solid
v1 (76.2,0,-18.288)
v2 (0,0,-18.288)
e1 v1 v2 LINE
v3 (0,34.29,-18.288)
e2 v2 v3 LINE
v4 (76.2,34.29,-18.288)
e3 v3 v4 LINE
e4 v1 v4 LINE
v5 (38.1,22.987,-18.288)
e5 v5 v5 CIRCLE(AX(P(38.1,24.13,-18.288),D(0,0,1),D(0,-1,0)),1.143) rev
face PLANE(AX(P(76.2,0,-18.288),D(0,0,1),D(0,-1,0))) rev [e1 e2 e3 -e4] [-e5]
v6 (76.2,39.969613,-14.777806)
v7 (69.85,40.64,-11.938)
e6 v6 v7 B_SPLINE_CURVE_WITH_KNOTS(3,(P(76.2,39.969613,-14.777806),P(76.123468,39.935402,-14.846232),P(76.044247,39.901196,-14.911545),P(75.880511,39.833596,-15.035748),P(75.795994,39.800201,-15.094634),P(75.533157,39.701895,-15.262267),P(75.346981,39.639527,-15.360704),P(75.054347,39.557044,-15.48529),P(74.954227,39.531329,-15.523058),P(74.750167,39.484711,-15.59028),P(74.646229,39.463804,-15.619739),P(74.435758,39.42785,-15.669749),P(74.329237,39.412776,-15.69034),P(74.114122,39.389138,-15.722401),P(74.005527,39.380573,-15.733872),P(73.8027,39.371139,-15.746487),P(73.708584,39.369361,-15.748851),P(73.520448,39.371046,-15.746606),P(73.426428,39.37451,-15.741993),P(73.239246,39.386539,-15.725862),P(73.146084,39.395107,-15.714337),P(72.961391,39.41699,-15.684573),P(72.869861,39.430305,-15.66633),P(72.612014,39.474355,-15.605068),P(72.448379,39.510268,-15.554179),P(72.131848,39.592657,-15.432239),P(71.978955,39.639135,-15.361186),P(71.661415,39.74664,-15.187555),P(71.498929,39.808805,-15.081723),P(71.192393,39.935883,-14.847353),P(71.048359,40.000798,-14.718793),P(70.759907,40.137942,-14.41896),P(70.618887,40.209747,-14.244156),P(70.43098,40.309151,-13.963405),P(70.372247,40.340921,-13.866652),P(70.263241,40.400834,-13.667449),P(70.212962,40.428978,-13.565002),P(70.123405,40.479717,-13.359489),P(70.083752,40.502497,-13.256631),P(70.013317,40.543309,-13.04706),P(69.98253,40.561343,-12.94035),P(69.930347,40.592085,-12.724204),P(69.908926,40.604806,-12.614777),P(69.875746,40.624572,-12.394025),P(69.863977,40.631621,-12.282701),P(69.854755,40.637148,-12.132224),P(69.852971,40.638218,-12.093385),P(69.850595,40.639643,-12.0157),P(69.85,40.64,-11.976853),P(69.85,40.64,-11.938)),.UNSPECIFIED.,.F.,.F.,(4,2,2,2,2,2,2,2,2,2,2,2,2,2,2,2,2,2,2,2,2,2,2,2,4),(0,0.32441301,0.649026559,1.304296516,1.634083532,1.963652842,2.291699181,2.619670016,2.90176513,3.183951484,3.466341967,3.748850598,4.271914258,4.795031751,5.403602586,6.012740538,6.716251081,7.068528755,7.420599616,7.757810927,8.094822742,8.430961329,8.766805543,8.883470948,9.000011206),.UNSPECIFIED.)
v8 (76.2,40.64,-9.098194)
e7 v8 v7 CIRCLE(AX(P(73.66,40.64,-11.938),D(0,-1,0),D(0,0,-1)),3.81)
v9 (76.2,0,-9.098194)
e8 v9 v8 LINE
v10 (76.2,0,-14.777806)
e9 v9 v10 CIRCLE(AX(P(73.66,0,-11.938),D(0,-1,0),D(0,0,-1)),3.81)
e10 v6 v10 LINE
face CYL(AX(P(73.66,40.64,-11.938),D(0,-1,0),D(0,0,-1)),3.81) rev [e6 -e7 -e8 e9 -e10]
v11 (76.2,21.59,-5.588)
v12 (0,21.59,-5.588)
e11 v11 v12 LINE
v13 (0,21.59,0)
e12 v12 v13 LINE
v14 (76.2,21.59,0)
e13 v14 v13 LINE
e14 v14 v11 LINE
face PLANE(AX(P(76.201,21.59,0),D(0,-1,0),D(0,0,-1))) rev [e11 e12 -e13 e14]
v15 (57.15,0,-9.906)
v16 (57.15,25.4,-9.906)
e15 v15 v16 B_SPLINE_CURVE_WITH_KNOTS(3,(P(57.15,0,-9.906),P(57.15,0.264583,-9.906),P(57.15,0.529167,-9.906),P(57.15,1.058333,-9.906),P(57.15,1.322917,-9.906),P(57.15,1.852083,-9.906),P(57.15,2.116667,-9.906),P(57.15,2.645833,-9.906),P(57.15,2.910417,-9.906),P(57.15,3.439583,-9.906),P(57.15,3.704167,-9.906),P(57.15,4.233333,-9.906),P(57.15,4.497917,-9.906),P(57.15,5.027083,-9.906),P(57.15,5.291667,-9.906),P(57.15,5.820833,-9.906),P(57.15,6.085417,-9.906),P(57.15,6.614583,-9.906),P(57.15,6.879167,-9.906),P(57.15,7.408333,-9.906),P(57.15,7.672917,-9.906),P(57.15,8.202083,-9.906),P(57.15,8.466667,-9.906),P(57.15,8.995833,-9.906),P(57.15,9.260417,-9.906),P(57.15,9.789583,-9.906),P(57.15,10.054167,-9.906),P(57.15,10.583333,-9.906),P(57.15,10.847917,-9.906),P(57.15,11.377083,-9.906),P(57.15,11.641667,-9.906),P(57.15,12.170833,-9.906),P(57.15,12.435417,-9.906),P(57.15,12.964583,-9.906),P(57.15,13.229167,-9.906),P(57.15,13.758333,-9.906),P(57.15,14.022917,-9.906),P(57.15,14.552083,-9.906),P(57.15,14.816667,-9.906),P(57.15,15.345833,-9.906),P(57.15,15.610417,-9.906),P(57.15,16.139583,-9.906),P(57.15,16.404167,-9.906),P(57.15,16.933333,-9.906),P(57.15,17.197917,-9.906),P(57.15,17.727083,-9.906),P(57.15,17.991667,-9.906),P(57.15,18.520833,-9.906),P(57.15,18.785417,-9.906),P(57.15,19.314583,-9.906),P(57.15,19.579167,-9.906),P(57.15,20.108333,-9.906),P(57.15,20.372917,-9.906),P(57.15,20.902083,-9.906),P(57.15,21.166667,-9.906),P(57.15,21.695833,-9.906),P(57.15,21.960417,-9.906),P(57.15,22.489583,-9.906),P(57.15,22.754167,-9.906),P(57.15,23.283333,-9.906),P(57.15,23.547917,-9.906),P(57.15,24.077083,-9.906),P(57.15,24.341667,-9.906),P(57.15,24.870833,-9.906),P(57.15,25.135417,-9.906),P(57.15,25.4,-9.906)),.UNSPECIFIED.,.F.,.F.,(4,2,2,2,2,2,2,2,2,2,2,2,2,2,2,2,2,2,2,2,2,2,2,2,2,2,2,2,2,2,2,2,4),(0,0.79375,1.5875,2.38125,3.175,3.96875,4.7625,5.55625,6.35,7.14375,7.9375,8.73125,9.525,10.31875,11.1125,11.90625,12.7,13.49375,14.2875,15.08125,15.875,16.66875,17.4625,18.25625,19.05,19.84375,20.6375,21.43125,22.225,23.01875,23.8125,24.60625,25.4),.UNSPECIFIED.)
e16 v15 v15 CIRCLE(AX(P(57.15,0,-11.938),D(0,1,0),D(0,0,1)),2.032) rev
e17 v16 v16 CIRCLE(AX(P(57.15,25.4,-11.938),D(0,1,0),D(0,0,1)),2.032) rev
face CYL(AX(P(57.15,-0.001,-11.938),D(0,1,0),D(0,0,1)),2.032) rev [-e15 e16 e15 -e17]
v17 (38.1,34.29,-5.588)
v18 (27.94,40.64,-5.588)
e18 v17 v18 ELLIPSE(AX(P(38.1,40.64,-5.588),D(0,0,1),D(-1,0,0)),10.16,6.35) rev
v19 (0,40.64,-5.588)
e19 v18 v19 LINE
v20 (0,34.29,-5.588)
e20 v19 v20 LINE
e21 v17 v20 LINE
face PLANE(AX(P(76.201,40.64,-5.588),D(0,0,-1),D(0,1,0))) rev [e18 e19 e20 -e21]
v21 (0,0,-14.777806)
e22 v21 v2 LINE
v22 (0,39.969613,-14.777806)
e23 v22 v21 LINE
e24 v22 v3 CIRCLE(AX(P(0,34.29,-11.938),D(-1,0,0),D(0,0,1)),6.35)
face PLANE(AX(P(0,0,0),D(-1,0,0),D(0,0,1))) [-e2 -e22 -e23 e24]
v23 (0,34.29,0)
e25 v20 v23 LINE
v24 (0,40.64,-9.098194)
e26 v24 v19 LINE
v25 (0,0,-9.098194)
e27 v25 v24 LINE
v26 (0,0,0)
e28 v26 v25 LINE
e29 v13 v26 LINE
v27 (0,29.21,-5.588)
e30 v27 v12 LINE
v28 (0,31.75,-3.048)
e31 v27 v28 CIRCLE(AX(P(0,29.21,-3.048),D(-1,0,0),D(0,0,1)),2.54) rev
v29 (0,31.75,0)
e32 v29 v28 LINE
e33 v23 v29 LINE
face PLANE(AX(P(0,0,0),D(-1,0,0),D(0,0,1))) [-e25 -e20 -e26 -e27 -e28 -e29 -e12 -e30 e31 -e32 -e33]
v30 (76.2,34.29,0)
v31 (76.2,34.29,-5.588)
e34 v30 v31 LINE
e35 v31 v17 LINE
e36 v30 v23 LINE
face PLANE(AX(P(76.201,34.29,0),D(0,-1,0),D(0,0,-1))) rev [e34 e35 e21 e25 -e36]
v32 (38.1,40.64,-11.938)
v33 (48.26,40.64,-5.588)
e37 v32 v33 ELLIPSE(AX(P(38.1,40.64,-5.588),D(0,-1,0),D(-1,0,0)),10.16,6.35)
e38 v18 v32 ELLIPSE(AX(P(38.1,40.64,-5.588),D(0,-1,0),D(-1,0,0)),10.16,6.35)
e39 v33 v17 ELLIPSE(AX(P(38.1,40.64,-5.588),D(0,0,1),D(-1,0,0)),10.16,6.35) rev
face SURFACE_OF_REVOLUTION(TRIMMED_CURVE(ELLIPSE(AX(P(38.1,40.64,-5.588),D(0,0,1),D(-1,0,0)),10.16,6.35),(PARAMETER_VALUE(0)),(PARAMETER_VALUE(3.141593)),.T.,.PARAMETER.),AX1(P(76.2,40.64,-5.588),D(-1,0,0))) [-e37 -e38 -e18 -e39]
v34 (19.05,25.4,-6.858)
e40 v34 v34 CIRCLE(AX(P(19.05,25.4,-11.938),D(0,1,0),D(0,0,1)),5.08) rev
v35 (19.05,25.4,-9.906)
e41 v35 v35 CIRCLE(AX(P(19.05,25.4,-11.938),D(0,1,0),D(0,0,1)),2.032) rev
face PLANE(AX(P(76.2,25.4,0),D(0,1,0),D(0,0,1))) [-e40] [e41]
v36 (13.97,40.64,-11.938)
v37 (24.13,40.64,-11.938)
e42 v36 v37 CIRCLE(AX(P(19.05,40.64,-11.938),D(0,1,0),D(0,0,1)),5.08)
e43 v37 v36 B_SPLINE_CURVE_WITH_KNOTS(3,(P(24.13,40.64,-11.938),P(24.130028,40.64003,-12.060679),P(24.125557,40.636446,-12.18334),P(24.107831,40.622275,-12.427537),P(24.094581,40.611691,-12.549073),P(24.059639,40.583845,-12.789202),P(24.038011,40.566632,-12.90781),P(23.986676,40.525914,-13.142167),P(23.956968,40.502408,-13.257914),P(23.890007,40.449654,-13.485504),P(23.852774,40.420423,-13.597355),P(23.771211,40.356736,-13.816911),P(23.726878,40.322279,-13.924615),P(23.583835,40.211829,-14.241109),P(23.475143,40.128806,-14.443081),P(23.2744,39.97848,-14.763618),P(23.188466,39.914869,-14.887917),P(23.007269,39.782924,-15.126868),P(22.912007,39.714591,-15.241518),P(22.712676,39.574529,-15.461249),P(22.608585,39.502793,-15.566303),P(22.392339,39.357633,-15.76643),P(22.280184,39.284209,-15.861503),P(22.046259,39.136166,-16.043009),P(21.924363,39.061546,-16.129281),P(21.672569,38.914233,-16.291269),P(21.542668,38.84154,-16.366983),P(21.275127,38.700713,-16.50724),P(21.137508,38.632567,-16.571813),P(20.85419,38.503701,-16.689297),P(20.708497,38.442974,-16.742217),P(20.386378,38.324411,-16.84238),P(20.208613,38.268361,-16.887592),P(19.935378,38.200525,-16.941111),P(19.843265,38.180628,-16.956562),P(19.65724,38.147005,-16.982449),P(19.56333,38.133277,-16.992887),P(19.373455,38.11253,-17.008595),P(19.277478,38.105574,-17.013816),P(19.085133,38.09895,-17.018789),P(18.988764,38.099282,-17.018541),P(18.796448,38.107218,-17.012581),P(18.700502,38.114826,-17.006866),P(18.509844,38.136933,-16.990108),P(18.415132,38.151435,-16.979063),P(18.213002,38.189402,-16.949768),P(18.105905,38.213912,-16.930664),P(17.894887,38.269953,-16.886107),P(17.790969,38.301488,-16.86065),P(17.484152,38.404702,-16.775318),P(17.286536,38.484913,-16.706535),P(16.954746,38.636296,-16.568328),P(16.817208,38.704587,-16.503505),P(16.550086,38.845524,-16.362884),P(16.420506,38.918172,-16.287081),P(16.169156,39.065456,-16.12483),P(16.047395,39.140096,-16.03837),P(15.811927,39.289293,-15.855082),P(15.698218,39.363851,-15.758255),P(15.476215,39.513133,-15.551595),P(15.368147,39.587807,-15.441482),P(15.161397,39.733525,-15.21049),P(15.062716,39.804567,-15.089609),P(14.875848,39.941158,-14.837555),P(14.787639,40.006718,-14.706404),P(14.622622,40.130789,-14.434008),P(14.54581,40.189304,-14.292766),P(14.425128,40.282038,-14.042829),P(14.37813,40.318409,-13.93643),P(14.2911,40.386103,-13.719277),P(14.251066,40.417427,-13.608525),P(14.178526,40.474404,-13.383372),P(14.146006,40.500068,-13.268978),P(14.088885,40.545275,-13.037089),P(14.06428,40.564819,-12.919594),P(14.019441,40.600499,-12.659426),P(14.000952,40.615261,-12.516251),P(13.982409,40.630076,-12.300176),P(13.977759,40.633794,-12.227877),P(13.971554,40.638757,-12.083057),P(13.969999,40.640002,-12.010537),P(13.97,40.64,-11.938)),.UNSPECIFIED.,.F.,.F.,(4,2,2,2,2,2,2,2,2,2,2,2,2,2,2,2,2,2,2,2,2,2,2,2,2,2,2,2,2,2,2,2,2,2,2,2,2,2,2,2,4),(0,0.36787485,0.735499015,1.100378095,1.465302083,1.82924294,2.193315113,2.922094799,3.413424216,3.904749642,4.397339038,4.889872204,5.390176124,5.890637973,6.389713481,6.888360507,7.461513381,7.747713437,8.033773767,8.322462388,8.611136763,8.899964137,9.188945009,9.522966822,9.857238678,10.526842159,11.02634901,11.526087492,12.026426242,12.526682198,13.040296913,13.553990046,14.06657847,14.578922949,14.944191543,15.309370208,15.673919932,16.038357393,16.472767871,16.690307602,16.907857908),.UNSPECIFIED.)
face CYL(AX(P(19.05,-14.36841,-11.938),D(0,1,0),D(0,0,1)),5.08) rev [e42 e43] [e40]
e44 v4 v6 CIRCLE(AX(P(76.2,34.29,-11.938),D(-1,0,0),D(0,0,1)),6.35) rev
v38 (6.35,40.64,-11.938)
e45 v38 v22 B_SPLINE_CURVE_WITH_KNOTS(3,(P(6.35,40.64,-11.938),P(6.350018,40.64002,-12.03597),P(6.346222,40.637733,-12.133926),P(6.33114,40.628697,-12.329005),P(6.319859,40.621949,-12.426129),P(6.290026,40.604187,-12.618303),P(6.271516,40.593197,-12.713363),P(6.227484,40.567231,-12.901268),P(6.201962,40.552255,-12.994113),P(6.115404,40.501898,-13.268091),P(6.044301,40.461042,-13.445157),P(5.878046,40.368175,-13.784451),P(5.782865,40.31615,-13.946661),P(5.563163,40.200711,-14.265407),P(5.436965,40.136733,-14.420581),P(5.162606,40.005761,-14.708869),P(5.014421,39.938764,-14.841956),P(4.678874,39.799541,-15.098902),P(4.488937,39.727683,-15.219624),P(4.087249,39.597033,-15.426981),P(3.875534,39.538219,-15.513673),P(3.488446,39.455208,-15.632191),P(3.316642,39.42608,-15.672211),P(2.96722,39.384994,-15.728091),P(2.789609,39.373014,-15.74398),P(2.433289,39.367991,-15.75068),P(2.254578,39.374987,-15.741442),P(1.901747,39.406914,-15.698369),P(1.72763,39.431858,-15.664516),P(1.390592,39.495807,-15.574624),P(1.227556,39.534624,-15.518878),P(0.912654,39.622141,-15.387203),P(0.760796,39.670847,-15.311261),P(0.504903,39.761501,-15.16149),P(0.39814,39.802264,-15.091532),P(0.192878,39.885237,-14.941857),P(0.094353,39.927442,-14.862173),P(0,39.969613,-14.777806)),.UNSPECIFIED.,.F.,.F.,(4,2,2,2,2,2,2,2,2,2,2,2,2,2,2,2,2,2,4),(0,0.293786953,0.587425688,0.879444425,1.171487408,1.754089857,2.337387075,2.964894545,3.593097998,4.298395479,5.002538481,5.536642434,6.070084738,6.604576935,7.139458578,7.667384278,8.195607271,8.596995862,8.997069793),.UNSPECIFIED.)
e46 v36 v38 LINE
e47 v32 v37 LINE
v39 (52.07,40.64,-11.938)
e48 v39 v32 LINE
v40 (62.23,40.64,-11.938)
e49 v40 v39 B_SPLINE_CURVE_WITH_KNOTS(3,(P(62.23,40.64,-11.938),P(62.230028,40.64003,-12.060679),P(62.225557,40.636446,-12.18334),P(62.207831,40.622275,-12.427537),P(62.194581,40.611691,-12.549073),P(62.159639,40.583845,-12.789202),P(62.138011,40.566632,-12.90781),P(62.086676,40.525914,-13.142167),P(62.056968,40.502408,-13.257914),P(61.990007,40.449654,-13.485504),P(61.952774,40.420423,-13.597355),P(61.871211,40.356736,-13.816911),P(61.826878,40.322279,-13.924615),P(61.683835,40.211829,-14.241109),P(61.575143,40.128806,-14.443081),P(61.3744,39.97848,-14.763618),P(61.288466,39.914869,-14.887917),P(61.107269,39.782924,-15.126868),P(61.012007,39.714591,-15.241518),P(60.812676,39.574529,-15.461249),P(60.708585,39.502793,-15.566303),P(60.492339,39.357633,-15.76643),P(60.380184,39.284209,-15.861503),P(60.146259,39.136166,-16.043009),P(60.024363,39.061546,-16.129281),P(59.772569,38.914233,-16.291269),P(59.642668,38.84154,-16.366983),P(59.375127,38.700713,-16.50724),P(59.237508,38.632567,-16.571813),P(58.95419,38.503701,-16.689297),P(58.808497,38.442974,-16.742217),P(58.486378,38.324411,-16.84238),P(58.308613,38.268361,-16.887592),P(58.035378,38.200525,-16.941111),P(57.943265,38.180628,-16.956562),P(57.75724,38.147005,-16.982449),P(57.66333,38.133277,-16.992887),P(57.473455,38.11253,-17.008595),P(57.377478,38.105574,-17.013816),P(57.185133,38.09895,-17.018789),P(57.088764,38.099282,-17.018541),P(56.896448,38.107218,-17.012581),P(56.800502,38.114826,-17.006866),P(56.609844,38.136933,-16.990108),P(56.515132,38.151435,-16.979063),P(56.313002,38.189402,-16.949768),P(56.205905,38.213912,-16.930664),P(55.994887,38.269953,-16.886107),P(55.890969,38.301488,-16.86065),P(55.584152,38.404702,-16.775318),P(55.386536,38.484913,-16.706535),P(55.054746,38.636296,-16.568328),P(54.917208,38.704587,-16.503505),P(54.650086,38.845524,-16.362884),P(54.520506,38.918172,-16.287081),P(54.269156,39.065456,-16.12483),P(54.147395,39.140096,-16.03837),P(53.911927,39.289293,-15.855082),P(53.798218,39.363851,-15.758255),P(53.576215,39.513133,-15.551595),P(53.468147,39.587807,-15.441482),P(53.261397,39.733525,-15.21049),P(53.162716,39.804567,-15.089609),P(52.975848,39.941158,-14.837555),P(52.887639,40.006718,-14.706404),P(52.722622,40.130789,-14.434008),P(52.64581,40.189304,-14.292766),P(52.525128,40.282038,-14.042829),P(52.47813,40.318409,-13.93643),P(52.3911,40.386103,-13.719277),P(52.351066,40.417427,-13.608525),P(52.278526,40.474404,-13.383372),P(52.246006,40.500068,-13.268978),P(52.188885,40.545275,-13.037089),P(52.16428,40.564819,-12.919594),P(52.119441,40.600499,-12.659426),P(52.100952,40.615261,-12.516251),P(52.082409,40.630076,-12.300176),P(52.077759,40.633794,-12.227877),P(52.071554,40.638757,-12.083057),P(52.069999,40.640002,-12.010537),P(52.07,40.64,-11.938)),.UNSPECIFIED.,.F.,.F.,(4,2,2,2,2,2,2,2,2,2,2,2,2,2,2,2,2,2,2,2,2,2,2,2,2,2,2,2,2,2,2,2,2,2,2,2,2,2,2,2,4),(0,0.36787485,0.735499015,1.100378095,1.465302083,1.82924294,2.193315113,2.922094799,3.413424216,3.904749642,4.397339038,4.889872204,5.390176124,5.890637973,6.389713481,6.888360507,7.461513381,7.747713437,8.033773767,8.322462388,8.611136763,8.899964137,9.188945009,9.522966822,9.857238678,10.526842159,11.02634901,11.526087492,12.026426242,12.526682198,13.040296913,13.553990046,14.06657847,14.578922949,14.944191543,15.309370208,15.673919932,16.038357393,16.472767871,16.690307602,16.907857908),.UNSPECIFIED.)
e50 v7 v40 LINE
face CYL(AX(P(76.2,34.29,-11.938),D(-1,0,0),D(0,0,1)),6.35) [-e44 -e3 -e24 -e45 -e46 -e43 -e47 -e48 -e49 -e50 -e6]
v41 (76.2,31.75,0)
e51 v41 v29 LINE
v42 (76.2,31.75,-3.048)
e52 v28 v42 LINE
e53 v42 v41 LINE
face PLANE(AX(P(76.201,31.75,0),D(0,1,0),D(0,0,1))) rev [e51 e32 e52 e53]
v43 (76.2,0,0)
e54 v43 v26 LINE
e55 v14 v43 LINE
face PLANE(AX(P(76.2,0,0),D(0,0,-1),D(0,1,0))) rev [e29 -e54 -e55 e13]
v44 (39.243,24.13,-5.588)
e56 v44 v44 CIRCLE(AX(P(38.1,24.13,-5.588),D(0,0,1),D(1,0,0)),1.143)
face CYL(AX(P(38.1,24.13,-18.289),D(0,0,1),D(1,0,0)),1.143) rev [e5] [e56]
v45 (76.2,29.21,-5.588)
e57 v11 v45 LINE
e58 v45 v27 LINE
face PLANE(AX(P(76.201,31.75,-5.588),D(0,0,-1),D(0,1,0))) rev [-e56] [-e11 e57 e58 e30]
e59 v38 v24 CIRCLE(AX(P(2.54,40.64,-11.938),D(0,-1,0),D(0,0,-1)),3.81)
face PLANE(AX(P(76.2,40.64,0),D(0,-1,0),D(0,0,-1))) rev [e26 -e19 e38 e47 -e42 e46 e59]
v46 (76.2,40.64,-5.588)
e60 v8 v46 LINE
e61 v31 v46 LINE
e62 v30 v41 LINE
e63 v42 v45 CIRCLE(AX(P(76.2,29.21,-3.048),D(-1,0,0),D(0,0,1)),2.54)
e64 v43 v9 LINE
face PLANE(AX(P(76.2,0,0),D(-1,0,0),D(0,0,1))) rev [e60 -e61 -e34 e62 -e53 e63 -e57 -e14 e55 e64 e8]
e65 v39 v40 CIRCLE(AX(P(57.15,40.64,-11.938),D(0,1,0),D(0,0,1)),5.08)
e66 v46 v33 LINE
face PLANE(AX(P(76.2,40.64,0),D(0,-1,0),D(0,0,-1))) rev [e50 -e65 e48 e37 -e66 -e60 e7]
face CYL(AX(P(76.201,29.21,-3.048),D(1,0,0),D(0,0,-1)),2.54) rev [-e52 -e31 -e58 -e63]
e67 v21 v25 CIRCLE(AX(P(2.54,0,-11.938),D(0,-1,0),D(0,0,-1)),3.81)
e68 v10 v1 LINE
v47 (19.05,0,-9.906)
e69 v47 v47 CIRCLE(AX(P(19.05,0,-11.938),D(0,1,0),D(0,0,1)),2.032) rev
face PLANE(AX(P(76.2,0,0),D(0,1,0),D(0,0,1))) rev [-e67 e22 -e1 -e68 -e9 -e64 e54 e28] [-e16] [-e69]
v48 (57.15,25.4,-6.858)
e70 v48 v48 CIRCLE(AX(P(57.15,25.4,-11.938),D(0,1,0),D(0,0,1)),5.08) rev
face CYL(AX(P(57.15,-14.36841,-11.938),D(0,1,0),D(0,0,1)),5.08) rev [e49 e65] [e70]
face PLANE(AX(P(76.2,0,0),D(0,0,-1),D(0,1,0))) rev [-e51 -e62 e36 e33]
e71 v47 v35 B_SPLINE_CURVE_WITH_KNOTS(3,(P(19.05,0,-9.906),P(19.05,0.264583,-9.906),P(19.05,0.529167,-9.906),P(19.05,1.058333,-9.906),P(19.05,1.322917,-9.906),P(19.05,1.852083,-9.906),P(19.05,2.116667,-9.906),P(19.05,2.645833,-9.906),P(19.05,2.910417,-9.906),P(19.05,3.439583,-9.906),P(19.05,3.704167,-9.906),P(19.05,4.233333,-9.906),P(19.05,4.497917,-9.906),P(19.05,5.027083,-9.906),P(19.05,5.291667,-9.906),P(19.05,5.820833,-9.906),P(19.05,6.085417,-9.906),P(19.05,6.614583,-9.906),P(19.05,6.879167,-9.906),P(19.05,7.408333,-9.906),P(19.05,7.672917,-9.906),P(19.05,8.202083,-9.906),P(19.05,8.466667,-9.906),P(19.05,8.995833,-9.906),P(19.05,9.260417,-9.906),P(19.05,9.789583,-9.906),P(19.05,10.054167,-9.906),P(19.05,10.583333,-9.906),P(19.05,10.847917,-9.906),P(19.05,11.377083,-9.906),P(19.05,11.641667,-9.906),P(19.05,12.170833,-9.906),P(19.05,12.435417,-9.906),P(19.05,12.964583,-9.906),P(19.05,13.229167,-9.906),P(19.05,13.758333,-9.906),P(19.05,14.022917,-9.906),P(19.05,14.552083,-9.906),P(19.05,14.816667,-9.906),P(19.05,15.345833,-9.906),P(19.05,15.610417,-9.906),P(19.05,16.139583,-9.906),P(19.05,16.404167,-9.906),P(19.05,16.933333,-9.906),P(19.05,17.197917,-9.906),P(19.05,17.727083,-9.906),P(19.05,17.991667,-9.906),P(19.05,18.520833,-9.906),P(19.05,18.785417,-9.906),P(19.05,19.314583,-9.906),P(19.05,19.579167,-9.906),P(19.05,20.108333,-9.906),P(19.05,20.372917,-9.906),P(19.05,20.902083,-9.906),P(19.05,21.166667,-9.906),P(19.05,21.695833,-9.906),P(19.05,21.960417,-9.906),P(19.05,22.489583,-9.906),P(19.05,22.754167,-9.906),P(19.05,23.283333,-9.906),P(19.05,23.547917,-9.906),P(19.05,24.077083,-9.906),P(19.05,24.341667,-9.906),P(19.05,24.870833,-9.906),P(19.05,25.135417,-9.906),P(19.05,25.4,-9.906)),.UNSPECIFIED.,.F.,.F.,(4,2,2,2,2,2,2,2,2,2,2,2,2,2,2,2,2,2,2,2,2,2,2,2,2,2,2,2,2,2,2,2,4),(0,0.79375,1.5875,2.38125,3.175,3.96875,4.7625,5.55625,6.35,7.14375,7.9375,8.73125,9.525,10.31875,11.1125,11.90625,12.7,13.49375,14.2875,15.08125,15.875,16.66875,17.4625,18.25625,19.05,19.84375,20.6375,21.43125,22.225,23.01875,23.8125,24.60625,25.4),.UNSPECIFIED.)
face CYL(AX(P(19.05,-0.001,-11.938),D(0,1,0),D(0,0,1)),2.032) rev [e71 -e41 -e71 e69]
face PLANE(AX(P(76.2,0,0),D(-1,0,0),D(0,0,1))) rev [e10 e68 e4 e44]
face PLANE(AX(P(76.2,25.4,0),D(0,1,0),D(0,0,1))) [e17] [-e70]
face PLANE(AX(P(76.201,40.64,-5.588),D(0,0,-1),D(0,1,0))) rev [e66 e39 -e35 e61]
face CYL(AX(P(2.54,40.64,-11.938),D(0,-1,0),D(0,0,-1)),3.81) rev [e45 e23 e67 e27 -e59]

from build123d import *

# Parameters (mm, degrees)
SKETCH2_W           = 18.288
SKETCH2_H           = 40.64
BOSS_EXTRUDE1_DEPTH = 76.2
CUT_EXTRUDE1_REACH  = 90.275
SKETCH3_W           = 5.588
SKETCH3_H           = 6.35
SKETCH3_H_2         = 10.16
CUT_EXTRUDE2_REACH  = 89.289
SKETCH4_R           = 1.143
CUT_EXTRUDE3_REACH  = 90.275
SKETCH5_R           = 2.032
SKETCH6_R           = 5.08
CUT_EXTRUDE4_DEPTH  = 15.24
FILLET1_R           = 6.35
FILLET2_R           = 2.54
SKETCH7_R           = 3.81
CUT_EXTRUDE5_DEPTH  = 89.275141297


with BuildPart() as part:
    # Sketch2 → Boss-Extrude1 (new body)
    with BuildSketch(Plane(origin=(0, 0, 0), x_dir=(0, 0, -1), z_dir=(1, 0, 0))):
        with Locations((9.144, 20.32)):
            Rectangle(SKETCH2_W, SKETCH2_H)
    extrude(amount=BOSS_EXTRUDE1_DEPTH)

    # Sketch3 → Cut-Extrude1 (cut, up to next)
    with BuildSketch(Plane.ZY, mode=Mode.PRIVATE) as cut_extrude1_sk1:
        with Locations((-2.794, 37.465)):
            Rectangle(SKETCH3_W, SKETCH3_H)
    cut_extrude1_tool1 = extrude(cut_extrude1_sk1.sketch, amount=-CUT_EXTRUDE1_REACH, mode=Mode.PRIVATE) & part.part
    # Sketch3 → Cut-Extrude1 (cut, up to next)
    with BuildSketch(Plane.ZY, mode=Mode.PRIVATE) as cut_extrude1_sk2:
        with Locations((-2.794, 26.67)):
            Rectangle(SKETCH3_W, SKETCH3_H_2)
    cut_extrude1_tool2 = extrude(cut_extrude1_sk2.sketch, amount=-CUT_EXTRUDE1_REACH, mode=Mode.PRIVATE) & part.part
    add(cut_extrude1_tool1.solids().sort_by_distance((0, 37.465, -2.794))[0], mode=Mode.SUBTRACT)
    add(cut_extrude1_tool2.solids().sort_by_distance((0, 26.67, -2.794))[0], mode=Mode.SUBTRACT)

    # Sketch4 → Cut-Extrude2 (cut, up to next)
    with BuildSketch(Plane.XY.offset(-5.588), mode=Mode.PRIVATE) as cut_extrude2_sk1:
        with Locations((38.1, 24.13)):
            Circle(SKETCH4_R)
    cut_extrude2_tool1 = extrude(cut_extrude2_sk1.sketch, amount=-CUT_EXTRUDE2_REACH, mode=Mode.PRIVATE) & part.part
    add(cut_extrude2_tool1.solids().sort_by_distance((38.1, 24.13, -5.588))[0], mode=Mode.SUBTRACT)

    # Sketch5 → Cut-Extrude3 (cut, up to next)
    with BuildSketch(Plane(origin=(0, 40.64, 0), x_dir=(1, 0, 0), z_dir=(0, 1, 0)), mode=Mode.PRIVATE) as cut_extrude3_sk1:
        with Locations(Location((57.15, 11.938, 0), (0, 0, 270))):
            Circle(SKETCH5_R)
    cut_extrude3_tool1 = extrude(cut_extrude3_sk1.sketch, amount=-CUT_EXTRUDE3_REACH, mode=Mode.PRIVATE) & part.part
    # Sketch5 → Cut-Extrude3 (cut, up to next)
    with BuildSketch(Plane(origin=(0, 40.64, 0), x_dir=(1, 0, 0), z_dir=(0, 1, 0)), mode=Mode.PRIVATE) as cut_extrude3_sk2:
        with Locations(Location((19.05, 11.938, 0), (0, 0, 270))):
            Circle(SKETCH5_R)
    cut_extrude3_tool2 = extrude(cut_extrude3_sk2.sketch, amount=-CUT_EXTRUDE3_REACH, mode=Mode.PRIVATE) & part.part
    add(cut_extrude3_tool1.solids().sort_by_distance((57.15, 40.64, -11.938))[0], mode=Mode.SUBTRACT)
    add(cut_extrude3_tool2.solids().sort_by_distance((19.05, 40.64, -11.938))[0], mode=Mode.SUBTRACT)

    # Sketch6 → Cut-Extrude4 (cut)
    with BuildSketch(Plane(origin=(0, 40.64, 0), x_dir=(1, 0, 0), z_dir=(0, 1, 0))):
        with Locations(Location((19.05, 11.938, 0), (0, 0, 270))):
            Circle(SKETCH6_R)
        with Locations(Location((57.15, 11.938, 0), (0, 0, 270))):
            Circle(SKETCH6_R)
    extrude(amount=-CUT_EXTRUDE4_DEPTH, mode=Mode.SUBTRACT)

    # Fillet1
    # the kernel refuses this fillet: 6.35 mm, written as the material it takes off along each edge
    with BuildSketch(Plane(origin=(-15.875, 40.64, -18.288), x_dir=(0, -1, 0), z_dir=(1, 0, 0))) as fillet1_piece_1:
        with BuildLine():
            CenterArc((FILLET1_R, -FILLET1_R), FILLET1_R, 90, 90)
            Line((0, -FILLET1_R), (0, 0))
            Line((0, 0), (FILLET1_R, 0))
        make_face()
    extrude(amount=107.95, mode=Mode.SUBTRACT)

    # Fillet2
    fillet2_edges = [part.edges().sort_by_distance(p)[0] for p in [
        (38.1, 31.75, -5.588),
    ]]
    fillet(fillet2_edges, radius=FILLET2_R)

    # Sketch7 → Cut-Extrude5 (cut, through all)
    with BuildSketch(Plane.XZ):
        with Locations((2.54, -11.938)):
            Circle(SKETCH7_R)
        with Locations((73.66, -11.938)):
            Circle(SKETCH7_R)
    extrude(amount=-CUT_EXTRUDE5_DEPTH, mode=Mode.SUBTRACT)

    # Sketch8 → Cut-Revolve3 (revolve, cut)
    with BuildSketch(Plane.XY.offset(-5.588)):
        with BuildLine():
            Line((27.94, 40.64), (48.26, 40.64))
            add(Edge.make_bspline(
                [(27.94, 40.64), (27.94, 34.29), (38.1, 34.29), (48.26, 34.29), (48.26, 40.64)],
                knots=[0, 0, 0, 1.570796327, 1.570796327, 3.141592654, 3.141592654, 3.141592654], degree=2, weights=[1, 0.707106781, 1, 0.707106781, 1]))
        make_face()
    revolve(axis=Axis((76.201, 40.64, -5.588), (-1, 0, 0)), mode=Mode.SUBTRACT)


solid = part.part
